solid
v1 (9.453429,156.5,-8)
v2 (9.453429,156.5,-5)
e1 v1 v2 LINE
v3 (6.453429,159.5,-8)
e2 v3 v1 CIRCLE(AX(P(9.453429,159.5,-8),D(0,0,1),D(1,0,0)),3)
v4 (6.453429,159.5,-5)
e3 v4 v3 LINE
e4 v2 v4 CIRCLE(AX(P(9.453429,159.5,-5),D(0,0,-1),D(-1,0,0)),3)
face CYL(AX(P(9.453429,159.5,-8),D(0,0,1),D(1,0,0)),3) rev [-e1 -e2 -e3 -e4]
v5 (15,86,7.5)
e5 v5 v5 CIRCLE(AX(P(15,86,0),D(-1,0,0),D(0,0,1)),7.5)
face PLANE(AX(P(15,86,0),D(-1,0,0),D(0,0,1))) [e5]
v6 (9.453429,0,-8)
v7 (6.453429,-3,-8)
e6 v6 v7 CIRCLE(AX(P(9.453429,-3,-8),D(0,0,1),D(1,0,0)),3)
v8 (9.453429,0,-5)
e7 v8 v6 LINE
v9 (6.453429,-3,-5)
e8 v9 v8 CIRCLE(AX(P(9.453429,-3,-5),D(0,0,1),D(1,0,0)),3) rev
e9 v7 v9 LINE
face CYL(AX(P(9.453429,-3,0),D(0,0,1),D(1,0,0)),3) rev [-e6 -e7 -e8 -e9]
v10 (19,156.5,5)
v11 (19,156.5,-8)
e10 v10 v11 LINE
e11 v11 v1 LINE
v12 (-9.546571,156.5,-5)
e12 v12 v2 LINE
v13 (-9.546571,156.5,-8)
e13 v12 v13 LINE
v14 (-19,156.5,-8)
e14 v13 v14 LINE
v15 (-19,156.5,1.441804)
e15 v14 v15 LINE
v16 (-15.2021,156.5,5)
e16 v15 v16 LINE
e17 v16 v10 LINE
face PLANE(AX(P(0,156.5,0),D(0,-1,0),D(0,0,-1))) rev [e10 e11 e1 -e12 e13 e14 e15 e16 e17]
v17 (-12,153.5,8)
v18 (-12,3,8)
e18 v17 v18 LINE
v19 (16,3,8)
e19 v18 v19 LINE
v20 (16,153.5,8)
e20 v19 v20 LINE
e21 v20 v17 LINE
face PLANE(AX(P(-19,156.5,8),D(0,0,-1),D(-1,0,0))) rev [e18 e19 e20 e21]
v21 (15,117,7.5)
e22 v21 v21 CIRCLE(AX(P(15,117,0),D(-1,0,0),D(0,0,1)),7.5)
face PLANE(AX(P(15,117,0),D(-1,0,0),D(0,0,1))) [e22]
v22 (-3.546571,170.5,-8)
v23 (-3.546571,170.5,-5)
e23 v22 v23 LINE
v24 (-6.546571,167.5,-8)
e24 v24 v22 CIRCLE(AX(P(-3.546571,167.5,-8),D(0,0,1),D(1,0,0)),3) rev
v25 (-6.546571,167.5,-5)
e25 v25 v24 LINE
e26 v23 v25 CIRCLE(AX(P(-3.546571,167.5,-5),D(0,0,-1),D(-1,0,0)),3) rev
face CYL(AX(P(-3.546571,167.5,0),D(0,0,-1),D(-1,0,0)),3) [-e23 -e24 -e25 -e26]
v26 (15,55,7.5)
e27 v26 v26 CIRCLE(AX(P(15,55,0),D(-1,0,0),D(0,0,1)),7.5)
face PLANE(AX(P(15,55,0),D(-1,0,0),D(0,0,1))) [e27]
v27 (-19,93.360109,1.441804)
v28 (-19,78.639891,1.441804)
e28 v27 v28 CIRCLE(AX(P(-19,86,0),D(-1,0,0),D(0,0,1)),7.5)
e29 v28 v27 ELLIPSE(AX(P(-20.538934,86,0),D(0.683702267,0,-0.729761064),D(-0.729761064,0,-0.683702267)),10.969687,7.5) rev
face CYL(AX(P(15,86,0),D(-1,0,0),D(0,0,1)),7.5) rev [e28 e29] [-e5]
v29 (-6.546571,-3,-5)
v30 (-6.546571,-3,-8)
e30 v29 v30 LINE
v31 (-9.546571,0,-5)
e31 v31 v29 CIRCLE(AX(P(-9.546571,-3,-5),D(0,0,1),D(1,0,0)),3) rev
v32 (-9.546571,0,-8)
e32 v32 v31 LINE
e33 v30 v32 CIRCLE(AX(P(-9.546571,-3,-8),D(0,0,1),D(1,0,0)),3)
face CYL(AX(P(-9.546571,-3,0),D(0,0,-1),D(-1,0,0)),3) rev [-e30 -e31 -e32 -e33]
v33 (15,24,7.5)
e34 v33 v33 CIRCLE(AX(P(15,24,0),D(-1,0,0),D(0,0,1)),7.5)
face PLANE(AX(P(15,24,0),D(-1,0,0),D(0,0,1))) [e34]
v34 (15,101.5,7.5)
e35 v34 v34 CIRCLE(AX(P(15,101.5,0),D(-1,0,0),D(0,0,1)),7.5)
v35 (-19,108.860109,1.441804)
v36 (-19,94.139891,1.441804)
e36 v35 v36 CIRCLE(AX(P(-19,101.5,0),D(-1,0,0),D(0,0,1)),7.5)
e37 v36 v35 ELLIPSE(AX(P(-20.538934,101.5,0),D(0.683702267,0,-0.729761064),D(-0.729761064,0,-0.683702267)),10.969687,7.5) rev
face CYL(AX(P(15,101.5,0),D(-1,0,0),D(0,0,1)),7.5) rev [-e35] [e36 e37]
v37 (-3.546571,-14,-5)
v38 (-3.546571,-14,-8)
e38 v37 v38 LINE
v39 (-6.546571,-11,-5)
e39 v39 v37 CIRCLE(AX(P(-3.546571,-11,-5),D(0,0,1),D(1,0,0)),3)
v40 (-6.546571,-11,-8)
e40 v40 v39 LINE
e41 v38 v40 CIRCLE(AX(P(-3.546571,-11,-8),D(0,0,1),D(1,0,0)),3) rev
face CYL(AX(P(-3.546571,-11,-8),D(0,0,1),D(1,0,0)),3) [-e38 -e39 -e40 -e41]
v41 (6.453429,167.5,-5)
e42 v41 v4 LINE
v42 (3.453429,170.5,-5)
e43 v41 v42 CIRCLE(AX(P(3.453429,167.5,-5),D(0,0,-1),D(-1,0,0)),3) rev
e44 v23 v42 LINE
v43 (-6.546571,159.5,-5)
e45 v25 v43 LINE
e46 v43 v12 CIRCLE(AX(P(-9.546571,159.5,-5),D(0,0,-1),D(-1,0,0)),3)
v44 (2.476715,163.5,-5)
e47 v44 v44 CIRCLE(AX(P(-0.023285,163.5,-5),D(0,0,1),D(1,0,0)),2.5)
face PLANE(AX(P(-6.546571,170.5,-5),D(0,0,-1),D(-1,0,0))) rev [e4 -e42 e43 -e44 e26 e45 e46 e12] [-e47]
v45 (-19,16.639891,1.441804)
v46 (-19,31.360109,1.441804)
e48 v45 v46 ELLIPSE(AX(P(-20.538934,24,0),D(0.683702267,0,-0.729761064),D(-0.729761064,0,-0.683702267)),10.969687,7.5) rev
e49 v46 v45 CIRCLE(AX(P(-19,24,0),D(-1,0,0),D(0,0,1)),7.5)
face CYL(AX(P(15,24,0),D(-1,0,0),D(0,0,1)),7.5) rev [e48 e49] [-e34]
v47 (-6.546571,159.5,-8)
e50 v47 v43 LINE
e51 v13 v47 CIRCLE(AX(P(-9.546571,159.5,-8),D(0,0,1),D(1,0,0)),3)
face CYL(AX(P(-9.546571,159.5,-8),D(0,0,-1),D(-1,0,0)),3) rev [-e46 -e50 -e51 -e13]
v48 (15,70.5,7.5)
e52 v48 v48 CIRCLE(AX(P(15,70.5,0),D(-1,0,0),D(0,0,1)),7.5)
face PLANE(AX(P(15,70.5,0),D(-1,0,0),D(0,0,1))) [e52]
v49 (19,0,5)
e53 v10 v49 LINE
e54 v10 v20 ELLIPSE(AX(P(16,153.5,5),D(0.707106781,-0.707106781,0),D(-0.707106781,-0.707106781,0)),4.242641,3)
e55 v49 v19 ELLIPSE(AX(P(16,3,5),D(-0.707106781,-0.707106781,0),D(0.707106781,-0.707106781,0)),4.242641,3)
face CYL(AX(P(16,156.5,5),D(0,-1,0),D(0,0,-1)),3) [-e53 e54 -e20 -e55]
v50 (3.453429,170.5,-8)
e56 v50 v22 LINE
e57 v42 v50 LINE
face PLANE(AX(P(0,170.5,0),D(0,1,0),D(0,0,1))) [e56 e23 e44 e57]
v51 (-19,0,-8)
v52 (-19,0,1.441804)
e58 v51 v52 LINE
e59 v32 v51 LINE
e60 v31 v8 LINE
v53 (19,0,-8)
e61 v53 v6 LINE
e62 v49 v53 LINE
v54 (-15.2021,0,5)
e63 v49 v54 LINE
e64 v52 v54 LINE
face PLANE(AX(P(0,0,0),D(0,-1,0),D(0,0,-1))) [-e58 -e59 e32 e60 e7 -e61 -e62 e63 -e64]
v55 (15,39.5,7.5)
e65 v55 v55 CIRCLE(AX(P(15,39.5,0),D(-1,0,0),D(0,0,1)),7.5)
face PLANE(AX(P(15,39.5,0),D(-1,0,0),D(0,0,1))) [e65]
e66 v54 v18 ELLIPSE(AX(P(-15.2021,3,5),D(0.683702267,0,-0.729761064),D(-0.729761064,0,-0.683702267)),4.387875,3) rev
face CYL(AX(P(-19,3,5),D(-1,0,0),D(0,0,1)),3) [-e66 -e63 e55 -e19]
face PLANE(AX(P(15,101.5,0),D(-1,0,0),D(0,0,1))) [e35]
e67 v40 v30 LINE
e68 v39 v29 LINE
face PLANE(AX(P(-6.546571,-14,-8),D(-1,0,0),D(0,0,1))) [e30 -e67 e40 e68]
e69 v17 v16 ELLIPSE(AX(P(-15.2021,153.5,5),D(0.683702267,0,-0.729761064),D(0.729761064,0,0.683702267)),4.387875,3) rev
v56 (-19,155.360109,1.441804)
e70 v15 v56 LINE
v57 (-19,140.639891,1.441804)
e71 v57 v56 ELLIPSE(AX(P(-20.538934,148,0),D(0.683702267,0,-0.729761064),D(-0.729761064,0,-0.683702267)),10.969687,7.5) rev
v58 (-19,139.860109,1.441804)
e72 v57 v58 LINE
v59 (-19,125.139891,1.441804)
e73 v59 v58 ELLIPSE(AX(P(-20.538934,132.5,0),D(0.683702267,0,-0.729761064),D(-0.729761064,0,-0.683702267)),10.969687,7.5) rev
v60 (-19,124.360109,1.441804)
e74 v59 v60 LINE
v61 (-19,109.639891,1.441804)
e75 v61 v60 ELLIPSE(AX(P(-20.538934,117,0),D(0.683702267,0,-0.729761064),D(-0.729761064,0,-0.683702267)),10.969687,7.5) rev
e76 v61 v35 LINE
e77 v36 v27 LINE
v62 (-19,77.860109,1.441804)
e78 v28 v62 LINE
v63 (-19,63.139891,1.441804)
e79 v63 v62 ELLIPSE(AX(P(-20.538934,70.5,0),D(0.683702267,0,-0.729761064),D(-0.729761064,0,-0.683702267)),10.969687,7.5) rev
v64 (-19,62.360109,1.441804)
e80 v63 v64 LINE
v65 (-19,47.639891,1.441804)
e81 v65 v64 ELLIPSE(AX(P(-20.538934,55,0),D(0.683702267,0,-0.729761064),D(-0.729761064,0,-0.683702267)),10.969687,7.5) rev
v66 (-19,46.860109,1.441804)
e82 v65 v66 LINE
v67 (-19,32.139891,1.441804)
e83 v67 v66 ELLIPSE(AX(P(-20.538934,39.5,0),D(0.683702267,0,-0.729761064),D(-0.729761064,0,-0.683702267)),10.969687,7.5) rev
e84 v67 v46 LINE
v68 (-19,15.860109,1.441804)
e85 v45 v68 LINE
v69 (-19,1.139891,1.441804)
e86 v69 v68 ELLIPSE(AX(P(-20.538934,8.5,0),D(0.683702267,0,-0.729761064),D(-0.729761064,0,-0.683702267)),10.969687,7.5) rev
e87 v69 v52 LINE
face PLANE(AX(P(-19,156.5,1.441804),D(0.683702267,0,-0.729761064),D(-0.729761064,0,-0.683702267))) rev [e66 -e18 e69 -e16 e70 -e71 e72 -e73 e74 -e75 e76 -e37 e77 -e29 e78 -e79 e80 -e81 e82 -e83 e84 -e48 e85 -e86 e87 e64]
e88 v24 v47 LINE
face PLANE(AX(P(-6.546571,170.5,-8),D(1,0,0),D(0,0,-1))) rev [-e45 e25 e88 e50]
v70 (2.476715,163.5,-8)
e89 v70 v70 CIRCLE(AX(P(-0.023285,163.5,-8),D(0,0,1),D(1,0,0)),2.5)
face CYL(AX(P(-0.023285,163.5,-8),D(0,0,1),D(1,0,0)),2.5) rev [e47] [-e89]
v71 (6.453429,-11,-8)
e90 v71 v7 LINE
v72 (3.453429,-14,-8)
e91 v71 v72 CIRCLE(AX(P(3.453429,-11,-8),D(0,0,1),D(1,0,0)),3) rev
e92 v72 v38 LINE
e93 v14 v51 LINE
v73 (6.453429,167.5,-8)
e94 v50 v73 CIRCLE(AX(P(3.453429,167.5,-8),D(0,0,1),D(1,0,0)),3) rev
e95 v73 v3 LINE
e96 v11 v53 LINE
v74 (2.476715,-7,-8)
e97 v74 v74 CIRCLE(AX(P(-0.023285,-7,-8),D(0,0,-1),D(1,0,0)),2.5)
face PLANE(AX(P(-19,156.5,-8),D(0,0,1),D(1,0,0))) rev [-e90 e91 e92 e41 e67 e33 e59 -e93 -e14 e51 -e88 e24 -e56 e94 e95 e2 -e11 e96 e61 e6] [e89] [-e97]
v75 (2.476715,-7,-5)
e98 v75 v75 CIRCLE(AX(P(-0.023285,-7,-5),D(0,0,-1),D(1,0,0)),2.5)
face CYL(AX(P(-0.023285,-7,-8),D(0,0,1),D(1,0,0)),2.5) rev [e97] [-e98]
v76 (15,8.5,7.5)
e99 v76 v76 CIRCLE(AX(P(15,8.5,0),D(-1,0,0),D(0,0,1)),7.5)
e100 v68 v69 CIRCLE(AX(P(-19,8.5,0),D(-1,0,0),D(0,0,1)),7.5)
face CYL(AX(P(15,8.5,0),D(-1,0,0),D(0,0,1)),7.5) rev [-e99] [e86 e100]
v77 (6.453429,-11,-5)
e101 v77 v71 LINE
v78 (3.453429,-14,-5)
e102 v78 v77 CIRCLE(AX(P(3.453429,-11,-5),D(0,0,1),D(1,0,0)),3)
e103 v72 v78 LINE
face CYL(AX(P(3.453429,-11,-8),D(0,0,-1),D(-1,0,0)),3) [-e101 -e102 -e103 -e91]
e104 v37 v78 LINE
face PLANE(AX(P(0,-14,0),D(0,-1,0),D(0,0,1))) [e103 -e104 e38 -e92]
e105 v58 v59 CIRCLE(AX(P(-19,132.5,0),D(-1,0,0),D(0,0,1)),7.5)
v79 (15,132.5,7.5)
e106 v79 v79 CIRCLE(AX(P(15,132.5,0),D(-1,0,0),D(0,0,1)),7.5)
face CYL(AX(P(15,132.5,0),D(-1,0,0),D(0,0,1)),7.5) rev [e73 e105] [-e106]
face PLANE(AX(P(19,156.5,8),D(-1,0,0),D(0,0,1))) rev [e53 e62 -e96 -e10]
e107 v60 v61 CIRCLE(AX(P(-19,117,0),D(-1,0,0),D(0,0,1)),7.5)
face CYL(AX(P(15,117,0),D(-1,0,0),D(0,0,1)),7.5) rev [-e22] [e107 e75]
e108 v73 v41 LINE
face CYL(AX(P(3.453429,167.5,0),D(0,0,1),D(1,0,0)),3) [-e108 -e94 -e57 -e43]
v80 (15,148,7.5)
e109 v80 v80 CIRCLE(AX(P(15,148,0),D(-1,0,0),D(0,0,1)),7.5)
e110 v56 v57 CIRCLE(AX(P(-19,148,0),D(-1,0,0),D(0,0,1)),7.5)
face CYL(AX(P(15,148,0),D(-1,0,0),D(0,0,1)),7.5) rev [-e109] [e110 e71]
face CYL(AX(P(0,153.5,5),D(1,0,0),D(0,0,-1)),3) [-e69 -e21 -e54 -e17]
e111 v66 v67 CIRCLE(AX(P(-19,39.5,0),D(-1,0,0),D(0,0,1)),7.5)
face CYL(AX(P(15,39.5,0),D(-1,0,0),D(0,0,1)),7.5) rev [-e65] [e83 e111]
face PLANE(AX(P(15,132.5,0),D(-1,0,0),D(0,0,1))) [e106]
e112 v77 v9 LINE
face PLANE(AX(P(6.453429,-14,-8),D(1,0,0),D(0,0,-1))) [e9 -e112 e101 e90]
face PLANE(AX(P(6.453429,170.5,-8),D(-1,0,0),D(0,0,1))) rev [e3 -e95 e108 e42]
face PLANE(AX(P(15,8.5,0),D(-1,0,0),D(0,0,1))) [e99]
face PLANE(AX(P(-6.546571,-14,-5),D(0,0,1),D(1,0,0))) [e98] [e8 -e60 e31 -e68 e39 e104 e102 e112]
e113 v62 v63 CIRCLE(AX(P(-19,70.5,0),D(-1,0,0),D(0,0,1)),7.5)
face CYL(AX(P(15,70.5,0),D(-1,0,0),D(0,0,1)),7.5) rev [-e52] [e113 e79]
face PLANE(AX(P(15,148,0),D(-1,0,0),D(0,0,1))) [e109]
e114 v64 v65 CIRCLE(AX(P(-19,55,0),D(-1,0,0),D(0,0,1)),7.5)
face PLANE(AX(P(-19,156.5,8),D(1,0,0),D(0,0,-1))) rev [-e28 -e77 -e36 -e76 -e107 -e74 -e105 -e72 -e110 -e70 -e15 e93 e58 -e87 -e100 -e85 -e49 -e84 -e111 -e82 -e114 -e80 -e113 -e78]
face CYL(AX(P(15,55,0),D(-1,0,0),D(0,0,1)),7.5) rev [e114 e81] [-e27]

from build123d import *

# Parameters (mm, degrees)
SKETCH_1_W          = 38
SKETCH_1_H          = 16
EXTRUDE_1_DEPTH     = 156.5
SKETCH_2_R          = 7.5
CUT_EXTRUDE_1_DEPTH = 34
SKETCH_3_W          = 13
SKETCH_3_H          = 3
EXTRUDE_2_DEPTH     = 14
SKETCH_5_R          = 2.5
CUT_EXTRUDE_2_DEPTH = 3
FILLET_1_R          = 3
CUT_EXTRUDE_3_DEPTH = 156.5
MIRROR_START        = -8
MIRROR_10_OUTLINE_R = 2.5
MIRROR_10_DEPTH     = 3
FILLET_9_R          = 3
FILLET_10_R         = 3


# Read off the part's stored shape, not the designer's step: Зеркальное отражение10
with BuildPart() as part:
    # Эскиз1 → Бобышка-Вытянуть1 (new body)
    with BuildSketch(Plane(origin=(0, 0, 0), x_dir=(1, 0, 0), z_dir=(0, 1, 0))):
        Rectangle(SKETCH_1_W, SKETCH_1_H)
    extrude(amount=EXTRUDE_1_DEPTH)

    # Эскиз2 → Вырез-Вытянуть1 (cut)
    with BuildSketch(Plane.ZY.offset(19)):
        with Locations((0, 8.5)):
            Circle(SKETCH_2_R)
        with Locations((0, 24)):
            Circle(SKETCH_2_R)
        with Locations((0, 39.5)):
            Circle(SKETCH_2_R)
        with Locations((0, 55)):
            Circle(SKETCH_2_R)
        with Locations((0, 70.5)):
            Circle(SKETCH_2_R)
        with Locations((0, 86)):
            Circle(SKETCH_2_R)
        with Locations((0, 101.5)):
            Circle(SKETCH_2_R)
        with Locations((0, 117)):
            Circle(SKETCH_2_R)
        with Locations((0, 132.5)):
            Circle(SKETCH_2_R)
        with Locations((0, 148)):
            Circle(SKETCH_2_R)
    extrude(amount=-CUT_EXTRUDE_1_DEPTH, mode=Mode.SUBTRACT)

    # Эскиз3 → Бобышка-Вытянуть2 (add)
    with BuildSketch(Plane(origin=(0, 156.5, 0), x_dir=(1, 0, 0), z_dir=(0, 1, 0))):
        with Locations((-0.046570885, 6.5)):
            Rectangle(SKETCH_3_W, SKETCH_3_H)
    extrude(amount=EXTRUDE_2_DEPTH)

    # Эскиз5 → Вырез-Вытянуть2 (cut)
    with BuildSketch(Plane.XY.offset(-5)):
        with Locations((-0.023285442, 163.5)):
            Circle(SKETCH_5_R)
    extrude(amount=-CUT_EXTRUDE_2_DEPTH, mode=Mode.SUBTRACT)

    # Скругление1
    fillet_1_edges = [part.edges().sort_by_distance(p)[0] for p in [
        (-6.546570885, 156.5, -6.5),
        (6.453429115, 156.5, -6.5),
        (-6.546570885, 170.5, -6.5),
        (6.453429115, 170.5, -6.5),
    ]]
    fillet(fillet_1_edges, radius=FILLET_1_R)

    # Эскиз6 → Вырез-Вытянуть3 (cut)
    with BuildSketch(Plane.XZ):
        Polygon((-19, 1.441804302), (-12, 8), (-19, 8), align=None)
    extrude(amount=-CUT_EXTRUDE_3_DEPTH, mode=Mode.SUBTRACT)

    # Зеркальное отражение10 outline → Зеркальное отражение10 (add)
    with BuildSketch(Plane.XY.offset(MIRROR_START)):
        with BuildLine():
            Line((6.453429115, 0), (-6.546570885, 0))
            Line((-6.546570885, 0), (-6.546570885, -11))
            ThreePointArc((-6.546570885, -11), (-5.667891229, -13.121320343), (-3.546570885, -14))
            Line((-3.546570885, -14), (3.453429115, -14))
            ThreePointArc((3.453429115, -14), (5.574749459, -13.121320344), (6.453429115, -11))
            Line((6.453429115, -11), (6.453429115, 0))
        make_face()
        with Locations((-0.023285442, -7)):
            Circle(MIRROR_10_OUTLINE_R, mode=Mode.SUBTRACT)
    extrude(amount=MIRROR_10_DEPTH)

    # Скругление9
    fillet_9_edges = [part.edges().sort_by_distance(p)[0] for p in [
        (-6.546570885, 0, -6.5),
        (6.453429115, 0, -6.5),
    ]]
    fillet(fillet_9_edges, radius=FILLET_9_R)

    # Скругление10
    fillet_10_edges = [part.edges().sort_by_distance(p)[0] for p in [
        (3.5, 0, 8),
        (3.5, 156.5, 8),
        (19, 78.25, 8),
    ]]
    fillet(fillet_10_edges, radius=FILLET_10_R)


solid = part.part
